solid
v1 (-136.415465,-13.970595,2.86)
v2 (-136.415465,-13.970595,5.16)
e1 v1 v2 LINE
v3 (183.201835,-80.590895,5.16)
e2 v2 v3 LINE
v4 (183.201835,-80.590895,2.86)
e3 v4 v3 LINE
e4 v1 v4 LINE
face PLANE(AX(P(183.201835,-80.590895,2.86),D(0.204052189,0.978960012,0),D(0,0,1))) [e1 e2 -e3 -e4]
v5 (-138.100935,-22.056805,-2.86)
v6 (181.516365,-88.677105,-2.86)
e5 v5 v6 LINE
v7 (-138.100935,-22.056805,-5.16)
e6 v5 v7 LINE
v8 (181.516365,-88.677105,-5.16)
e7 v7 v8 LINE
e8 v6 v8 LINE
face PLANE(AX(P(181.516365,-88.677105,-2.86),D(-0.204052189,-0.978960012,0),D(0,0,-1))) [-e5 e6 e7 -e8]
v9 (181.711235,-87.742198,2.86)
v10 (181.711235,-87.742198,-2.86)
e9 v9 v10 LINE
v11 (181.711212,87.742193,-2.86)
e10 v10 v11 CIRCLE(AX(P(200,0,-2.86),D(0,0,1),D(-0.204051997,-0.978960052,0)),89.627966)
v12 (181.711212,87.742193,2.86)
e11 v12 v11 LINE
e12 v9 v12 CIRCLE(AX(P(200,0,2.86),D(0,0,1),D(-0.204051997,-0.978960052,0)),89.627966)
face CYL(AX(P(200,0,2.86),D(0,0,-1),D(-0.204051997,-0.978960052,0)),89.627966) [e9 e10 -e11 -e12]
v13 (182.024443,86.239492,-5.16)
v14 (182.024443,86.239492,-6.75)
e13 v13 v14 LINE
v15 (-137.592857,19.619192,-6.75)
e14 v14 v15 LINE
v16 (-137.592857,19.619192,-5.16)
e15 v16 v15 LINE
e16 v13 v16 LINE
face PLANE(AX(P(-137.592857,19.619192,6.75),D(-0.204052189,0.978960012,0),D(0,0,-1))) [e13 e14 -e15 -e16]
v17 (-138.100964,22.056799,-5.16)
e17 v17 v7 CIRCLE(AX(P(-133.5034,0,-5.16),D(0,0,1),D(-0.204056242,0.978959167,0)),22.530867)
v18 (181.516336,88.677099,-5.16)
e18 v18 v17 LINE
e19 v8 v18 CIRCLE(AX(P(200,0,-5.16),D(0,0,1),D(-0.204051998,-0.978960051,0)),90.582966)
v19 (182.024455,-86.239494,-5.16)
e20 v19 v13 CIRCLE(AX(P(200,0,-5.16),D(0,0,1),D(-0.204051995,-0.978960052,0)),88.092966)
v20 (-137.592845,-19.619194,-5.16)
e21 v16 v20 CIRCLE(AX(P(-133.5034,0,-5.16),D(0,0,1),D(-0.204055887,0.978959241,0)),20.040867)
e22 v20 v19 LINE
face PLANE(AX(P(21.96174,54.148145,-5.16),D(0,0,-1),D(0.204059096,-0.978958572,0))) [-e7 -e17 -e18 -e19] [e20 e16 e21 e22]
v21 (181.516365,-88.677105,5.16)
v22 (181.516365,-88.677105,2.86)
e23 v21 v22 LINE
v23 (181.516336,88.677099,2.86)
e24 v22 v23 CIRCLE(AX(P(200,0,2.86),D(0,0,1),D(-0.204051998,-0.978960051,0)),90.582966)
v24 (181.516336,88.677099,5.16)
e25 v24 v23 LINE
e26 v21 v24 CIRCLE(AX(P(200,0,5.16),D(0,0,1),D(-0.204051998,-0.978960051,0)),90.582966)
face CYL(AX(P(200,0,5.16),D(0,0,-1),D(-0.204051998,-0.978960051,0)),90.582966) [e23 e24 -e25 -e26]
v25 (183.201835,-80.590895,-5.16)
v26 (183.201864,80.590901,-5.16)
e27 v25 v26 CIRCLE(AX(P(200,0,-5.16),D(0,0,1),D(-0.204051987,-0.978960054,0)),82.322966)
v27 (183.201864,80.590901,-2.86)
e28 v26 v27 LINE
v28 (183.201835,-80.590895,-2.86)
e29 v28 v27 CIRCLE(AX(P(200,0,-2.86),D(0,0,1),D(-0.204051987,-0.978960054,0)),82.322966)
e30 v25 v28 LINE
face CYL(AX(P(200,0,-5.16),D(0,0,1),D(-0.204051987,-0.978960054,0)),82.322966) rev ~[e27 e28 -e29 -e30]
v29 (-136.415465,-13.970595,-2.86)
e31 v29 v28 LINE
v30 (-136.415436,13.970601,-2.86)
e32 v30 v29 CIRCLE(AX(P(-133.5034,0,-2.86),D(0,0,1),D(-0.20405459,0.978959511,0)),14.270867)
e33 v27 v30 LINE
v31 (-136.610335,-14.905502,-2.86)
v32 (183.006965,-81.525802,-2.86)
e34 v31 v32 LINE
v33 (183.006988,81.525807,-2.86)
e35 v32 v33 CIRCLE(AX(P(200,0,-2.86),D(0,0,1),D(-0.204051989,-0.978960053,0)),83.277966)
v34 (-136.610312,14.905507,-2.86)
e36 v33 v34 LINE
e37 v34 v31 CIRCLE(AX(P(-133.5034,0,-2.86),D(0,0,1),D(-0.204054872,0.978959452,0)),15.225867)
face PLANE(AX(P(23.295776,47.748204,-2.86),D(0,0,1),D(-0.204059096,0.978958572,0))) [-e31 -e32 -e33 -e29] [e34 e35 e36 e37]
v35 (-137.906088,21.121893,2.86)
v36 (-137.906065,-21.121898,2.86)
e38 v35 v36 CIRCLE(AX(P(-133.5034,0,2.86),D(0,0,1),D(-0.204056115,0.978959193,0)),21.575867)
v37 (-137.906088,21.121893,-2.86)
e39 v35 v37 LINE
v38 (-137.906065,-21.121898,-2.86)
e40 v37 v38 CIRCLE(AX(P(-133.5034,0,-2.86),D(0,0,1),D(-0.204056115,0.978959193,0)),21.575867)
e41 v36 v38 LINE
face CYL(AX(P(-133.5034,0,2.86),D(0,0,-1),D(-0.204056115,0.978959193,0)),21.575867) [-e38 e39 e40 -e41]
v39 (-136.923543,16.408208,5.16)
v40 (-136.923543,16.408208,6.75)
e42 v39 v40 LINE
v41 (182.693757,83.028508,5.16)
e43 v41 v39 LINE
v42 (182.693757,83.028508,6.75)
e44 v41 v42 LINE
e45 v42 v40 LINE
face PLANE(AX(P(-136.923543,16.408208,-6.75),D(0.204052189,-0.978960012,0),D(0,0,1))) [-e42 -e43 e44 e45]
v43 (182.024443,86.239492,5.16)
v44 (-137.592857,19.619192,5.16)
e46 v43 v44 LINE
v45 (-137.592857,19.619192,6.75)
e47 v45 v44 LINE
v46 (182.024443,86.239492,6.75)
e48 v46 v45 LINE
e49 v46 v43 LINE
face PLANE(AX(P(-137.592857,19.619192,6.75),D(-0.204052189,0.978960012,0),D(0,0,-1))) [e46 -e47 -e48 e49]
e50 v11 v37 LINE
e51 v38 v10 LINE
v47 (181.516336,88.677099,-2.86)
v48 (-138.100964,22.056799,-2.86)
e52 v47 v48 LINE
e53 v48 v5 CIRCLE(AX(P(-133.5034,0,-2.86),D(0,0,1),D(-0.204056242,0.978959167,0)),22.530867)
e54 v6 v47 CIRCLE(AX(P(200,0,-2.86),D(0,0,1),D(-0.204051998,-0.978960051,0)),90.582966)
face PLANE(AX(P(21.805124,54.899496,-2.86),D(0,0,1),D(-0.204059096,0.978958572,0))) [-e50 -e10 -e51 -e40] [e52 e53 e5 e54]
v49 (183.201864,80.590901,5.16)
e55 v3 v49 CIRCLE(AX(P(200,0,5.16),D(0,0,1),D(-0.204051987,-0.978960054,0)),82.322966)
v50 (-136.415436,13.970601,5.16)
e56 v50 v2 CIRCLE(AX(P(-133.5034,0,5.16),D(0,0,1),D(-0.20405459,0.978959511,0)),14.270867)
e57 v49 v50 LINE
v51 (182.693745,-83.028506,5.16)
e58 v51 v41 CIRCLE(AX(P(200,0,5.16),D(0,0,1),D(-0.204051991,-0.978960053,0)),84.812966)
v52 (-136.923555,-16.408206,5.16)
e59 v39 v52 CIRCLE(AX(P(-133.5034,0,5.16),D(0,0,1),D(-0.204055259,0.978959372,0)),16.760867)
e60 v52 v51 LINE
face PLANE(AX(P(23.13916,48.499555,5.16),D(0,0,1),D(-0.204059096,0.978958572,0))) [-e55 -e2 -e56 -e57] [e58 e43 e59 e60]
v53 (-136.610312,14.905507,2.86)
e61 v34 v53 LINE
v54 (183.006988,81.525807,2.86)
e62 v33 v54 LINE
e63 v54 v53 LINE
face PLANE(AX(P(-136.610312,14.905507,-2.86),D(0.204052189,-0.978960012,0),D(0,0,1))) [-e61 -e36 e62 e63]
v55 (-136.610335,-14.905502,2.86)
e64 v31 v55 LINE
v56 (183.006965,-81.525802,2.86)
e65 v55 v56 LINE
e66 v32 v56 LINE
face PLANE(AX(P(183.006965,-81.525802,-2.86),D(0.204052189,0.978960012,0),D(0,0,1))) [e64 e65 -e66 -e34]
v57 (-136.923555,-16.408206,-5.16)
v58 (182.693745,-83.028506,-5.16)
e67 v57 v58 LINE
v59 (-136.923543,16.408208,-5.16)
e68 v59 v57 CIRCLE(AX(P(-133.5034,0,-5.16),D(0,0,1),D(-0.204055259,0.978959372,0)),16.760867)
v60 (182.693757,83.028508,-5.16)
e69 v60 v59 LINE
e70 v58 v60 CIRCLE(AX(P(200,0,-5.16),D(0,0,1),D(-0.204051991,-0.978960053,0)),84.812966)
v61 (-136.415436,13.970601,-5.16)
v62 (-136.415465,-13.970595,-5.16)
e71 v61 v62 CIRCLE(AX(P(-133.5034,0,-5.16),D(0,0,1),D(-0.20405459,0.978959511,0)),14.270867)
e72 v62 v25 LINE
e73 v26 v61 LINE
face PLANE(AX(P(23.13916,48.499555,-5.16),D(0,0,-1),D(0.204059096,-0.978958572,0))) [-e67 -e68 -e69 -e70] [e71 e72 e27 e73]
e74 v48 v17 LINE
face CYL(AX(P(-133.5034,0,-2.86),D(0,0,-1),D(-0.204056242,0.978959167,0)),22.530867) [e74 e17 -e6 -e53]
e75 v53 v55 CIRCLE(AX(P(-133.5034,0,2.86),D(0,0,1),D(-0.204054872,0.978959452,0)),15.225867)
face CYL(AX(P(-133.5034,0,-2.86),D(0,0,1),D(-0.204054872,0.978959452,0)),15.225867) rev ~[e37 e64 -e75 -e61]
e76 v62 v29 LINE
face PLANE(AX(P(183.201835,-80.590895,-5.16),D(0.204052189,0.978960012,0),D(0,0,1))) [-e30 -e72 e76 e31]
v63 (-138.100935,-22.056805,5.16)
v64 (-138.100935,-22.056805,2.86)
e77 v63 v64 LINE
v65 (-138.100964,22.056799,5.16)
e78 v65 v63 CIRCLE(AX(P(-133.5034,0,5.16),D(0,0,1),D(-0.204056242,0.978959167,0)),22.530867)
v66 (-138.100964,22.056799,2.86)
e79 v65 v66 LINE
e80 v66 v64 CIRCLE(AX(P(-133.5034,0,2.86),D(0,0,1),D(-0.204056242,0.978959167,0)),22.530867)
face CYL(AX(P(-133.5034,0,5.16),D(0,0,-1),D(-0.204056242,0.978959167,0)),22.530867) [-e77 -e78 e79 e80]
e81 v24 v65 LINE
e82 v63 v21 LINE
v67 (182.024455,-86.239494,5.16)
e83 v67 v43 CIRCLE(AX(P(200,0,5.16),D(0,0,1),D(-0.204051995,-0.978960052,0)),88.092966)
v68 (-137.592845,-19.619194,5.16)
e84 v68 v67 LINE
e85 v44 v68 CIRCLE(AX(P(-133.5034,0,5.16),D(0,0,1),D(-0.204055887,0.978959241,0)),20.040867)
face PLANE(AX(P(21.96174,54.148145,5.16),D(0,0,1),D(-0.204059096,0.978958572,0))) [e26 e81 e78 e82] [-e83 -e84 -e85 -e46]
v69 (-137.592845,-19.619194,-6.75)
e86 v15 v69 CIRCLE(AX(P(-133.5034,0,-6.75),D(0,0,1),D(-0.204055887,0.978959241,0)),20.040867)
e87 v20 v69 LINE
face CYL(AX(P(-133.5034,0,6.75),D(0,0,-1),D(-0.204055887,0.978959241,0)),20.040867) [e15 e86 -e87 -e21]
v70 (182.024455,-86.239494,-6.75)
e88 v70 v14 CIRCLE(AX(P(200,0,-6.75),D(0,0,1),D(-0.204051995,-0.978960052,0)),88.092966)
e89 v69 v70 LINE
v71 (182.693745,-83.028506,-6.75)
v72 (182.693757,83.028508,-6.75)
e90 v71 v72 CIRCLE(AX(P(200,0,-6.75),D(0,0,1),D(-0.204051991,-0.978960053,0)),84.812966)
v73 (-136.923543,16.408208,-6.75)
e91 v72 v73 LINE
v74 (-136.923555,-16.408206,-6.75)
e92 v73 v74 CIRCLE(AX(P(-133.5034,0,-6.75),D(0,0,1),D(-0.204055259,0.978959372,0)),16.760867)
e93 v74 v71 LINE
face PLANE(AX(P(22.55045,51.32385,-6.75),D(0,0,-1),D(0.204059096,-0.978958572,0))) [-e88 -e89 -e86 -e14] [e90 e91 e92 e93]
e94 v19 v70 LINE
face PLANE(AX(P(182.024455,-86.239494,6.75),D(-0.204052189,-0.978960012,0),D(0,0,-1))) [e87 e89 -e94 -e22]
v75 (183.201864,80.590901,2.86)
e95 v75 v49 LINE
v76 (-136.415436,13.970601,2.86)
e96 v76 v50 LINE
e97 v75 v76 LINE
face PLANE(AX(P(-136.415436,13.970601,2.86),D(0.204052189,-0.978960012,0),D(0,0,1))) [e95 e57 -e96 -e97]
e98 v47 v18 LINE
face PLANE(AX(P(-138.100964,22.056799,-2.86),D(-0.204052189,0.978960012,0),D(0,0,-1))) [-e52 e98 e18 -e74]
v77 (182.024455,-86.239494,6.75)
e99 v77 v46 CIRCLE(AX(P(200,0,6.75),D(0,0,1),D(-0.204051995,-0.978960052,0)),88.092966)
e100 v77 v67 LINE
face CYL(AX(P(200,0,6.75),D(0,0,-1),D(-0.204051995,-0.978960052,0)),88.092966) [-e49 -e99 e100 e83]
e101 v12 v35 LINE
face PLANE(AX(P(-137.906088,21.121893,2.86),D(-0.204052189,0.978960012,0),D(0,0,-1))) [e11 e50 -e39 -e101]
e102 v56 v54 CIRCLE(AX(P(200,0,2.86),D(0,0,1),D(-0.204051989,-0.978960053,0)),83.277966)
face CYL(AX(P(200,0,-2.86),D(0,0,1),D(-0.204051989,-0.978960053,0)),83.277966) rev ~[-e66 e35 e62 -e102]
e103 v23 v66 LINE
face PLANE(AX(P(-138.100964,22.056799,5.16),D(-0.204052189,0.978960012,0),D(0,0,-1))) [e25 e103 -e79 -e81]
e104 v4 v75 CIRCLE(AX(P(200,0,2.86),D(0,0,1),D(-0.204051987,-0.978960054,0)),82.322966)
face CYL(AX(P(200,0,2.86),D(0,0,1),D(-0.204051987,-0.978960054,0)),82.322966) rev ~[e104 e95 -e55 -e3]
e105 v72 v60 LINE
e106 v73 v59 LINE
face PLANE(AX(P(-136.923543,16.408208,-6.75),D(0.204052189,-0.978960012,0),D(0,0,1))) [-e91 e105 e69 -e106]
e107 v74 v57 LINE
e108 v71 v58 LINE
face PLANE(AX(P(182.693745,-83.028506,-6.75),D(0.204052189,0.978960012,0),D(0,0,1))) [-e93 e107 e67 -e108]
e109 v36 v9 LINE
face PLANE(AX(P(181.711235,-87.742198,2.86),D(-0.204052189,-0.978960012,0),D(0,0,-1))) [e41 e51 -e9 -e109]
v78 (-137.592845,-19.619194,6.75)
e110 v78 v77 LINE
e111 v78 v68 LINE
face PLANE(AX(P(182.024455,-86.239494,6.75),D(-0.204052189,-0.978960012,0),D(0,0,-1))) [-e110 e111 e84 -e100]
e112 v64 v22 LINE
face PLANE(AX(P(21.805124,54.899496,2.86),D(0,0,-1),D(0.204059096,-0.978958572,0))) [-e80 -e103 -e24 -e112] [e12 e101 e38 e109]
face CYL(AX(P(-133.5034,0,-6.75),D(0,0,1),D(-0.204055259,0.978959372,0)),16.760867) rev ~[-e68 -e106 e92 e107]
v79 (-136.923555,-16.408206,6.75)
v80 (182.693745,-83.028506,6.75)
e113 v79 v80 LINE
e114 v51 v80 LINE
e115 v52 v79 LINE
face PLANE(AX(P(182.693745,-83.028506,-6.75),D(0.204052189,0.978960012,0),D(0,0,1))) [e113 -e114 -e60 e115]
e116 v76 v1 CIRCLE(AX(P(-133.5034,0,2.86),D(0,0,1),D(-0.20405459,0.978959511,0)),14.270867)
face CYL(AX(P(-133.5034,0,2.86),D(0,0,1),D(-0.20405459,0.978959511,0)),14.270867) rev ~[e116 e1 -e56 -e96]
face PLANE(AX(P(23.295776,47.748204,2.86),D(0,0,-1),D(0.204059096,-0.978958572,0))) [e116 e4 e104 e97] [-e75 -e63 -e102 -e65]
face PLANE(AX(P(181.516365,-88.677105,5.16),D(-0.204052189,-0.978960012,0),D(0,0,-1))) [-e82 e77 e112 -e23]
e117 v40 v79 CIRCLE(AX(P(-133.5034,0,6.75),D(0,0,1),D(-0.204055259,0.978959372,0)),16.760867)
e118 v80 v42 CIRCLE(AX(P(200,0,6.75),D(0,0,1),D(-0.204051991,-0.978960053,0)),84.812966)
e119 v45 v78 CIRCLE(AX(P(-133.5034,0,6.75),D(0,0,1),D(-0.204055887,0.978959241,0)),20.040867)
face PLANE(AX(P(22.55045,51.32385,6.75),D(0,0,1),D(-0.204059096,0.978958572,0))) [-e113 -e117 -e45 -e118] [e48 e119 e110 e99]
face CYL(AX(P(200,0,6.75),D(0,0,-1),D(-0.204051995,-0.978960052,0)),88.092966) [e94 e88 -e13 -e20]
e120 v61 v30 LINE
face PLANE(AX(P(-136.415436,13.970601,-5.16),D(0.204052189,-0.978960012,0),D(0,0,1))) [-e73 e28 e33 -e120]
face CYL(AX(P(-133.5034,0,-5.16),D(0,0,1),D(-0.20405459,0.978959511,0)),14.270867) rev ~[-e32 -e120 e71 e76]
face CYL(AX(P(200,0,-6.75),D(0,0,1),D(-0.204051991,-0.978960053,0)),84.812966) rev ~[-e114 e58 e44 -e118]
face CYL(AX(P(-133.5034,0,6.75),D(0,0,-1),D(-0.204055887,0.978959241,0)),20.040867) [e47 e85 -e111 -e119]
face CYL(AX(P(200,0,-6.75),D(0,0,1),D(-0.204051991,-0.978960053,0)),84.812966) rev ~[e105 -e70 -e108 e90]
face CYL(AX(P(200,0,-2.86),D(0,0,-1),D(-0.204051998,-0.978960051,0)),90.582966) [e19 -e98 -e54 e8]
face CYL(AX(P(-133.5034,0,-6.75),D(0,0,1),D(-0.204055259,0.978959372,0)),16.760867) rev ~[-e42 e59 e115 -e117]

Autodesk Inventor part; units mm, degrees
ref_plane "Work Plane2" through (-133.5034, 0, 0) normal (-1, 0, 0) x (0, 0, 1)
ref_plane "Work Plane3" through (200, 0, 0) normal (-0.9814515, -0.1917106, 0) x (0, 0, 1)
sketch "Path" plane through (0, 0, 0) normal (0, 0, 1) x (1, 0, 0)
  arc A0 (-137.2582, 18.0137) -> (-137.2582, -18.0137) centre (-133.5034, 0) ccw
  arc A1 (182.3591, -84.634) -> (182.3591, 84.634) centre (200, 0) ccw
  line L0 (182.3591, -84.634) -> (-137.2582, -18.0137)
  line L1 (-137.2582, 18.0137) -> (182.3591, 84.634)
  dimension "d31" = 8.26
ref_plane "Section Plane" through (-137.2582, -18.0137, 0) normal (0.97896, -0.2040521, 0) x (0, 0, 1)
sketch "Section Sketch" plane through (-137.2582, -18.0137, 0) normal (0.97896, -0.2040521, 0) x (0, 0, 1)
  line L0 (-6.75, -1.64) -> (6.75, -1.64)
  line L1 (6.75, -1.64) -> (6.75, 1.64)
  line L2 (6.75, 1.64) -> (-6.75, 1.64)
  line L3 (-6.75, 1.64) -> (-6.75, -1.64)
  line L4 (-2.86, -3.175) -> (2.86, -3.175)
  line L5 (2.86, -3.175) -> (2.86, 3.175)
  line L6 (2.86, 3.175) -> (-2.86, 3.175)
  line L7 (-2.86, 3.175) -> (-2.86, -3.175)
  line L8 (-2.86, 0) -> (2.86, 0) construction
  line L9 (-5.16, -4.13) -> (-2.86, -4.13)
  line L10 (-2.86, -4.13) -> (-2.86, 4.13)
  line L11 (-2.86, 4.13) -> (-5.16, 4.13)
  line L12 (-5.16, 4.13) -> (-5.16, -4.13)
  line L13 (2.86, -4.13) -> (5.16, -4.13)
  line L14 (5.16, -4.13) -> (5.16, 4.13)
  line L15 (5.16, 4.13) -> (2.86, 4.13)
  line L16 (2.86, 4.13) -> (2.86, -4.13)
  line L17 (-6.75, 0) -> (6.75, 0) construction
  point P0 (0, 0)
  point P1 (0, 0)
  dimension "d21" = 3.28
  dimension "d22" = 6.35
  dimension "d23" = 5.72
  dimension "d24" = 2.3
  dimension "d31" = 8.26
  dimension "d32" = 13.5
sweep "Solid" add profiles "Section Sketch" path "Path"
pattern_of_one "Strand Pattern"
equation "\"d21\" = da_d2"
equation "\"d22\" = da_d1"
equation "\"d23\" = da_b1"
equation "\"d24\" = da_t1 + da_t2"
equation "\"d30\" = da_pt"
equation "\"da_p\" = 9.525"
equation "\"da_b1\" = 5.72"
equation "\"da_h2\" = 8.26"
equation "\"da_h3\" = 8.26"
equation "\"da_d1\" = 6.35"
equation "\"da_d2\" = 3.28"
equation "\"da_pt\" = 10.24"
equation "\"da_b\" = 13.5"
equation "\"da_t1\" = 1.3"
equation "\"da_t2\" = 1"
properties part number "Roller Chain"
